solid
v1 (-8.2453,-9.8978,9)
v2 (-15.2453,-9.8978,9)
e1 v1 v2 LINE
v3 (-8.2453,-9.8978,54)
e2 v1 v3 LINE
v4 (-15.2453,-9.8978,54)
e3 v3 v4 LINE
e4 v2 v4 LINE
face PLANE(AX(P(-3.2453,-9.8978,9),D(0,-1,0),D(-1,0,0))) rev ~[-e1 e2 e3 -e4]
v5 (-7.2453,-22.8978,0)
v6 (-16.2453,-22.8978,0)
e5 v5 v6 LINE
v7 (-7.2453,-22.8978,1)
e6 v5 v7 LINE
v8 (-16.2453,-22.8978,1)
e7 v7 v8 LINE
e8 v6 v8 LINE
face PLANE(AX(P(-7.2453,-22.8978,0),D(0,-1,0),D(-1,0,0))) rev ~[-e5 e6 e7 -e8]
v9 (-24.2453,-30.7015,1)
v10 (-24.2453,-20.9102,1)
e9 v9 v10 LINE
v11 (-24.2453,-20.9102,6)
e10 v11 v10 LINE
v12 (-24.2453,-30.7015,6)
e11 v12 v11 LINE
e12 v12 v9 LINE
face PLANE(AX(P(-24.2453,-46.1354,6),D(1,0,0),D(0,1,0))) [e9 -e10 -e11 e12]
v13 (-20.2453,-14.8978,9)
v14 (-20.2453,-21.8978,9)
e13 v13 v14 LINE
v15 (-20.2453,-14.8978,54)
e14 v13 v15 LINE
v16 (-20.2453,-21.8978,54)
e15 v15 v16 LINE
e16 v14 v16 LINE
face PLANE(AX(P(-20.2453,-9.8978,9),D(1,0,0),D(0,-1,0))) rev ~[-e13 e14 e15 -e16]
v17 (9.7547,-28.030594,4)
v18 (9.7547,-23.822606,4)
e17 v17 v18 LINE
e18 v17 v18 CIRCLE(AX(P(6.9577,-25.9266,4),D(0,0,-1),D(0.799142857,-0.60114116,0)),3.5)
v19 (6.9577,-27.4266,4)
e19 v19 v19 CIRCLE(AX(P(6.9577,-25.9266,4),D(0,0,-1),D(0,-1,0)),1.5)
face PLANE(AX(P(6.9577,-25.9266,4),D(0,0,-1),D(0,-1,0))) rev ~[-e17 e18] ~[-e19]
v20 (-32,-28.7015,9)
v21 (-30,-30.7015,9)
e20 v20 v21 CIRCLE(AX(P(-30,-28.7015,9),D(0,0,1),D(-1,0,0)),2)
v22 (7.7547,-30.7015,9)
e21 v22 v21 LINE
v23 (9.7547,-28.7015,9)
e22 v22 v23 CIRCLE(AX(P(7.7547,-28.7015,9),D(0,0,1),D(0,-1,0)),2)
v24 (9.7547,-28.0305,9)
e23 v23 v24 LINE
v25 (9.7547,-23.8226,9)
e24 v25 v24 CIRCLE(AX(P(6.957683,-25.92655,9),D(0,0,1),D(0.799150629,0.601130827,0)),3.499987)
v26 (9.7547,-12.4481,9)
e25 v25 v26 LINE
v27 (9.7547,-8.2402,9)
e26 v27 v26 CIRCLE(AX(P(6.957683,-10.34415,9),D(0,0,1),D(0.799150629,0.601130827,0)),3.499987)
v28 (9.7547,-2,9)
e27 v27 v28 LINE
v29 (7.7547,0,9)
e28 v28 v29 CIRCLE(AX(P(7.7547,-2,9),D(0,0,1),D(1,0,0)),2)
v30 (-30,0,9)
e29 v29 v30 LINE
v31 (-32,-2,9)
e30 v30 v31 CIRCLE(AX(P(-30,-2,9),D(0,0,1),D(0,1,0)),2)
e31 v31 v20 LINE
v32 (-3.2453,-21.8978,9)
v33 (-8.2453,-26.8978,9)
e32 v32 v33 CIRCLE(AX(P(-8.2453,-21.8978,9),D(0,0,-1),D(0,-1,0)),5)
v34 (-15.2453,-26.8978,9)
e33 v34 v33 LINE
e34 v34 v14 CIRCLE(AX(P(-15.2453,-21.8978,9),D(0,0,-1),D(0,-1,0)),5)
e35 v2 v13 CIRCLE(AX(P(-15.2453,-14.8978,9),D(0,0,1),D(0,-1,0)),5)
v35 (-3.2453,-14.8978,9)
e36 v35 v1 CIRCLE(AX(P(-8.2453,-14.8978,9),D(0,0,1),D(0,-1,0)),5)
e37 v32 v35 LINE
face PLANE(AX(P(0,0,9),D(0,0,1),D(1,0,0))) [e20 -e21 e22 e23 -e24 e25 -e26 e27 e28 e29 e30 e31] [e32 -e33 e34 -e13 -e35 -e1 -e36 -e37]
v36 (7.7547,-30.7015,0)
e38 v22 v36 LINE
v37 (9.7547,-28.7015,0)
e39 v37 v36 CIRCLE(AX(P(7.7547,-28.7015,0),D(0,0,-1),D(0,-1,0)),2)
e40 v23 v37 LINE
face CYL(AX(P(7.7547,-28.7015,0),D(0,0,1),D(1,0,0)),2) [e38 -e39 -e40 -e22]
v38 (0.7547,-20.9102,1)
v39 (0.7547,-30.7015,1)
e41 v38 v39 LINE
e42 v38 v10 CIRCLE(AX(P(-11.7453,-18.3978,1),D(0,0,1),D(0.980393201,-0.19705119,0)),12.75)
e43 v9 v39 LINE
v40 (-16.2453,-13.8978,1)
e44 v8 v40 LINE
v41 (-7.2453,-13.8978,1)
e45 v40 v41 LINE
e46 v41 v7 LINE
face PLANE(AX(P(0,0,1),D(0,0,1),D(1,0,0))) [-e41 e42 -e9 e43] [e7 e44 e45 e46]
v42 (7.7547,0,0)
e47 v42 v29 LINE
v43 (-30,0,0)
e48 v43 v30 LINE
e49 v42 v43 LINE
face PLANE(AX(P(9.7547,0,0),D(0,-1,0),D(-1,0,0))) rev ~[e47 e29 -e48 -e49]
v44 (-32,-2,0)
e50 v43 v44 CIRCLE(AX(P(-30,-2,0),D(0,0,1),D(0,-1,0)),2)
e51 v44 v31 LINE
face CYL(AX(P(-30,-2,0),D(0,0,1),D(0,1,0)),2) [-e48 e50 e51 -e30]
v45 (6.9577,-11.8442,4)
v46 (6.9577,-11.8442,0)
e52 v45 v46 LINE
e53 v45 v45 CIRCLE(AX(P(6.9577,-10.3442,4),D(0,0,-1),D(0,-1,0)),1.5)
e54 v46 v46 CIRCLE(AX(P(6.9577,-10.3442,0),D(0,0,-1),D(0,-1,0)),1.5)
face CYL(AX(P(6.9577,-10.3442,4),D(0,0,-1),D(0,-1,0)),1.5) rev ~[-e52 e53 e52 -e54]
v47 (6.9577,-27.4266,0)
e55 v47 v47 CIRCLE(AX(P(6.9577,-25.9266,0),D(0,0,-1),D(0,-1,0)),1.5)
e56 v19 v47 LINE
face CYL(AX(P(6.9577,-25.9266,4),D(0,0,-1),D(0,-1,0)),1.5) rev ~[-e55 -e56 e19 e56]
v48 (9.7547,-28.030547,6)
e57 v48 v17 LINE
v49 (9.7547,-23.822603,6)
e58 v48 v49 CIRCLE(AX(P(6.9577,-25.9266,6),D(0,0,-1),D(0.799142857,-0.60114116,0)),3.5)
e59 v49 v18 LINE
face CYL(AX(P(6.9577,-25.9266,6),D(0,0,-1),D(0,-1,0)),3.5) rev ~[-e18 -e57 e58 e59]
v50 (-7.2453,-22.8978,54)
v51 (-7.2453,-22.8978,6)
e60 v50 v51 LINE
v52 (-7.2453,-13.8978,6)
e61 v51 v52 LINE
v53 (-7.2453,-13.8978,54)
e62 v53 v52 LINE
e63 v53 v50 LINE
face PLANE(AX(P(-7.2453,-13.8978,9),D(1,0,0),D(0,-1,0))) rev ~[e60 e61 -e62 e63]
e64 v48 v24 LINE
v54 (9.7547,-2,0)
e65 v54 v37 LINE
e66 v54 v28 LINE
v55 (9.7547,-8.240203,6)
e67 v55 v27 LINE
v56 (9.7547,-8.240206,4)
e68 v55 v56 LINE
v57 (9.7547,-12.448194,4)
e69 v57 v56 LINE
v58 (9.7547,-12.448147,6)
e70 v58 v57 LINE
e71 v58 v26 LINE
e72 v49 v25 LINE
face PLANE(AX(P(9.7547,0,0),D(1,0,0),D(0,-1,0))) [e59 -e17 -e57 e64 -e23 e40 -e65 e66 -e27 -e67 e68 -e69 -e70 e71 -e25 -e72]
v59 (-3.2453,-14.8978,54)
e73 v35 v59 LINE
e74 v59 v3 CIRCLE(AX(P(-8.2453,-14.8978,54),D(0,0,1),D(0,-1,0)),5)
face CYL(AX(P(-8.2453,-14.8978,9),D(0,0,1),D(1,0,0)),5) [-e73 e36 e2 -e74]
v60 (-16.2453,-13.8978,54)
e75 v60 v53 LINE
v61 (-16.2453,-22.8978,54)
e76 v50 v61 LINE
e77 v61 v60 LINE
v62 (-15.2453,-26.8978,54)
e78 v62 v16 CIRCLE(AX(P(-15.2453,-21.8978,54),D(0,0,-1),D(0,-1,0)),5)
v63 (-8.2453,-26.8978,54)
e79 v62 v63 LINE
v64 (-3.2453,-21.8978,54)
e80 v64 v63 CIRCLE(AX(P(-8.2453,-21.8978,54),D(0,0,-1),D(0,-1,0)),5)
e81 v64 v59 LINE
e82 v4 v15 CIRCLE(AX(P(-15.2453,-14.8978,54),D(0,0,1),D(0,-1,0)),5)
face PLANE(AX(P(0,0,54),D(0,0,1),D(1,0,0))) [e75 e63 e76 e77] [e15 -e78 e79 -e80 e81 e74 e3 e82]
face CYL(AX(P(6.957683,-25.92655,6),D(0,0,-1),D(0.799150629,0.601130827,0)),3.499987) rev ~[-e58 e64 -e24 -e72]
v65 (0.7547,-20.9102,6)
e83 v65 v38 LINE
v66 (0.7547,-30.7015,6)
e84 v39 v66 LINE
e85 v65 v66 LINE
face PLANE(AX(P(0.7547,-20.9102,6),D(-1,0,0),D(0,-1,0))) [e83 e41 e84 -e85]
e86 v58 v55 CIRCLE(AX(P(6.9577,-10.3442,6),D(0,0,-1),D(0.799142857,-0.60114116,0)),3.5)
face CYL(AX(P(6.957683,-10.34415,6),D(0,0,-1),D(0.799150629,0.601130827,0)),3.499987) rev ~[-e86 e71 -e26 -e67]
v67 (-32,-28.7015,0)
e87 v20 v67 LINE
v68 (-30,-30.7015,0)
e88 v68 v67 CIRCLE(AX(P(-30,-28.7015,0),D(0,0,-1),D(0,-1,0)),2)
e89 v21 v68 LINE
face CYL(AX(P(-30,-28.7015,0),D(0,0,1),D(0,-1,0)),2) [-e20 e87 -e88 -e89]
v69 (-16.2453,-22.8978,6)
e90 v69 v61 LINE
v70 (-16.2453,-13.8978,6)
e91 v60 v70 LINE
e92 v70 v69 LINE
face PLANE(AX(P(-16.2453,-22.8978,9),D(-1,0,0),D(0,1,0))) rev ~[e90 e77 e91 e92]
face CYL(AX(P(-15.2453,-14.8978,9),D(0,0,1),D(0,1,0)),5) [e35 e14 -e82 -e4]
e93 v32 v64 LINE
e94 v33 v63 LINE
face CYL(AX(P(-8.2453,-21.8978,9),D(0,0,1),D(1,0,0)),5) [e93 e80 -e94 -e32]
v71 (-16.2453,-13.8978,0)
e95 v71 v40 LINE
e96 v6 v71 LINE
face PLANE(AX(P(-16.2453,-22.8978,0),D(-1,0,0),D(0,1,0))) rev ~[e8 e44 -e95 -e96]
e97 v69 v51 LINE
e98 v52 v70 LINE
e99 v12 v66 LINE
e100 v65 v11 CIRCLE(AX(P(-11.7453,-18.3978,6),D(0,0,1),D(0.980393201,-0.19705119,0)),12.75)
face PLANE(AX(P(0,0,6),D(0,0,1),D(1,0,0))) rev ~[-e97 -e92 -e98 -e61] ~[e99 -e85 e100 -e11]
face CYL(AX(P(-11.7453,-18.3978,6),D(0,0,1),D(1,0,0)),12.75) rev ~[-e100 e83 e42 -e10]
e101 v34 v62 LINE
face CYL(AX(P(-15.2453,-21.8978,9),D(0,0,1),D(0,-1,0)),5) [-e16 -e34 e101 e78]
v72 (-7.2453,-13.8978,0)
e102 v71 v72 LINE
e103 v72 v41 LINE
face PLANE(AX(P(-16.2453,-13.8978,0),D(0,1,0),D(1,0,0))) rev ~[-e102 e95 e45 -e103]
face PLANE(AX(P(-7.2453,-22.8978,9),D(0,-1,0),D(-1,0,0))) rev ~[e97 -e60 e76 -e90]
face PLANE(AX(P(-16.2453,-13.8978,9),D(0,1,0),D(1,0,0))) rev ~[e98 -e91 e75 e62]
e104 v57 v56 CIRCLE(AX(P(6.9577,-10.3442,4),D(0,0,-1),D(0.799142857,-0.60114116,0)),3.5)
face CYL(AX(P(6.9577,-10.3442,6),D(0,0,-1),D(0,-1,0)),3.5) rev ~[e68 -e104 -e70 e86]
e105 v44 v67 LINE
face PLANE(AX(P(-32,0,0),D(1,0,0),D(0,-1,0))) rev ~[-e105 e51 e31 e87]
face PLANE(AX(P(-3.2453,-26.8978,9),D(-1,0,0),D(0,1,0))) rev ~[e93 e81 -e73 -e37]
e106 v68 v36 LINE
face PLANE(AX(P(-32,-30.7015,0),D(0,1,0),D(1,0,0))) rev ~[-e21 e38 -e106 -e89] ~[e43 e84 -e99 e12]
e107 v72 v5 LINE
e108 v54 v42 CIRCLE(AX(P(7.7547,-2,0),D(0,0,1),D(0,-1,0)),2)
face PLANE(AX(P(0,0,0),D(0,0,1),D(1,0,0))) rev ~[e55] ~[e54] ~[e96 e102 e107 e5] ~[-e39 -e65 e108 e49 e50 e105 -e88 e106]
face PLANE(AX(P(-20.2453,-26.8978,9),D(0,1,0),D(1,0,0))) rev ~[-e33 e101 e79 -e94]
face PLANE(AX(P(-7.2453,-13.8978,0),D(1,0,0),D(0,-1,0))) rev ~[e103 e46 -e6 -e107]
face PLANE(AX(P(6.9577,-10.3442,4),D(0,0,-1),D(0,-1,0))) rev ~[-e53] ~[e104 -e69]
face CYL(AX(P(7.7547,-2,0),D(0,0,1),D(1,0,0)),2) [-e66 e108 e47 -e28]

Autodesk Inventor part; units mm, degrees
ref_plane "YZ Plane" through (0, 0, 0) normal (1, 0, 0) x (0, 1, 0)
ref_plane "XZ Plane" through (0, 0, 0) normal (0, 1, 0) x (-1, 0, 0)
ref_plane "XY Plane" through (0, 0, 0) normal (0, 0, 1) x (1, 0, 0)
ref_plane "Work Plane1" through (0, 0, 0) normal (0, 0, 1) x (1, 0, 0)
sketch "Sketch1" plane through (0, 0, 0) normal (0, 0, 1) x (1, 0, 0)
  line L0 (9.7547, 0) -> (-32, 0) construction
  line L1 (-32, 0) -> (-32, -5) construction
  line L2 (-5, -5) -> (-32, -5) construction
  line L3 (-5, -30.7015) -> (-5, -5) construction
  line L4 (-0.2453, -30.7015) -> (-5, -30.7015) construction
  line L5 (-0.2453, -30.7015) -> (-0.2453, -31) construction
  line L6 (-0.2453, -31) -> (4.1607, -31) construction
  line L7 (4.1607, -66) -> (4.1607, -31) projected
  line L8 (9.7547, -66) -> (4.1607, -66) projected
  line L9 (9.7547, 0) -> (9.7547, -66) projected
  circle A0 centre (-2.5, -10.3442) radius 1.45 construction
  circle A1 centre (-2.5, -25.9266) radius 1.45 construction
  circle A2 centre (-11.7453, -18.3978) radius 6 construction
  line L10 (-7.2453, -22.8978) -> (-16.2453, -22.8978)
  line L11 (-16.2453, -22.8978) -> (-16.2453, -13.8978)
  line L12 (-16.2453, -13.8978) -> (-7.2453, -13.8978)
  line L13 (-7.2453, -13.8978) -> (-7.2453, -22.8978)
  line L14 (-7.2453, -22.8978) -> (-16.2453, -13.8978)
  line L15 (-16.2453, -22.8978) -> (-7.2453, -13.8978)
  line L16 (9.7547, 0) -> (-32, 0) projected
  line L17 (9.7547, 0) -> (-32, 0) construction
  line L18 (-32, 0) -> (-32, -5) construction
  line L19 (-5, -5) -> (-32, -5) construction
  line L20 (-5, -30.7015) -> (-5, -5) construction
  line L21 (-0.2453, -30.7015) -> (-5, -30.7015) construction
  line L22 (-0.2453, -30.7015) -> (-0.2453, -31) construction
  line L23 (-0.2453, -31) -> (4.1607, -31) construction
  line L24 (4.1607, -66) -> (4.1607, -31) construction
  line L25 (9.7547, -66) -> (4.1607, -66) construction
  line L26 (9.7547, 0) -> (9.7547, -66) construction
  circle A3 centre (-2.5, -10.3442) radius 1.45 construction
  circle A4 centre (-2.5, -25.9266) radius 1.45 construction
  line L27 (9.7547, 0) -> (-32, 0)
  line L28 (-32, 0) -> (-32, -30.7015)
  line L29 (-32, -30.7015) -> (9.7547, -30.7015)
  line L30 (9.7547, -30.7015) -> (9.7547, 0)
  circle A5 centre (-2.5, -25.9266) radius 1.65
  circle A6 centre (-2.5, -10.3442) radius 1.65
  circle A7 centre (6.9577, -25.9266) radius 1.45 projected
  circle A8 centre (6.9577, -10.3442) radius 1.45 projected
  circle A9 centre (6.9577, -25.9266) radius 1.45 projected
  circle A10 centre (6.9577, -10.3442) radius 1.45 projected
  point P0 (0, 0)
  dimension "d0" = 9
  dimension "d1" = 9
  dimension "d2" = 3.3
  dimension "d3" = 3.3
extrude "Extrusion1" add sketch "Sketch1" along normal blind 6 contours L9 L29 L28 L16 | A5 | A6 | A7 | A8
sketch "Sketch2" plane through (0, 0, 6) normal (0, 0, 1) x (1, 0, 0)
  circle A0 centre (-2.5, -25.9266) radius 1.65 projected
  circle A1 centre (-2.5, -10.3442) radius 1.65 projected
  circle A2 centre (6.9577, -25.9266) radius 1.45 projected
  circle A3 centre (6.9577, -10.3442) radius 1.45 projected
  point P0 (0, 0)
hole "Hole1" at (6.9577, -25.9266, 6) at (6.9577, -10.3442, 6) direction (0, 0, -1) diameter 3 end through all counterbore diameter 7 counterbore depth 2
fillet "Fillet1" radius 2 4 edges at (-32, 0, 3) (9.7547, 0, 3) (9.7547, -30.7015, 3) (-32, -30.7015, 3)
sketch "Sketch3" plane through (0, 0, 6) normal (0, 0, 1) x (1, 0, 0)
  line L0 (-16.2453, -22.8978) -> (-16.2453, -13.8978) projected
  line L1 (-7.2453, -13.8978) -> (-7.2453, -22.8978) projected
  line L2 (-7.2453, -22.8978) -> (-16.2453, -22.8978) projected
  circle A0 centre (-11.7453, -18.3978) radius 6 projected
  circle A1 centre (-11.7453, -18.3978) radius 12.75
  line L3 (-24.4953, -18.3978) -> (1.0047, -18.3978)
  line L4 (0.7547, -46.1354) -> (-24.2453, -46.1354)
  line L5 (-24.2453, -46.1354) -> (-24.2453, -20.9102)
  line L6 (-24.2453, -20.9102) -> (0.7547, -20.9102)
  line L7 (0.7547, -20.9102) -> (0.7547, -46.1354)
  line L8 (0.7547, -46.1354) -> (-24.2453, -20.9102) construction
  line L9 (-24.2453, -46.1354) -> (0.7547, -20.9102) construction
  point P0 (0, 0)
  point P1 (-11.7453, -33.5228)
  dimension "d14" = 25.5
  dimension "d17" = 25
extrude "Extrusion2" cut sketch "Sketch3" against normal blind 5
sketch "Sketch4" plane through (0, 0, 6) normal (0, 0, 1) x (1, 0, 0)
  line L0 (0.7547, -20.9102) -> (0.7547, -30.7015) projected
  line L1 (0.7547, -30.7015) -> (7.7547, -30.7015) projected
  arc A0 (7.7547, -30.7015) -> (9.7547, -28.7015) centre (7.7547, -28.7015) ccw projected
  line L2 (9.7547, -28.7015) -> (9.7547, -28.0305) projected
  arc A1 (9.7547, -23.8226) -> (9.7547, -28.0305) centre (6.9577, -25.9266) ccw projected
  line L3 (9.7547, -23.8226) -> (9.7547, -12.4481) projected
  arc A2 (9.7547, -8.2402) -> (9.7547, -12.4481) centre (6.9577, -10.3442) ccw projected
  line L4 (9.7547, -8.2402) -> (9.7547, -2) projected
  arc A3 (9.7547, -2) -> (7.7547, 0) centre (7.7547, -2) ccw projected
  line L5 (7.7547, 0) -> (-30, 0) projected
  arc A4 (-30, 0) -> (-32, -2) centre (-30, -2) ccw projected
  line L6 (-32, -2) -> (-32, -28.7015) projected
  arc A5 (-32, -28.7015) -> (-30, -30.7015) centre (-30, -28.7015) ccw projected
  line L7 (-30, -30.7015) -> (-24.2453, -30.7015) projected
  line L8 (-24.2453, -30.7015) -> (-24.2453, -20.9102) projected
  arc A6 (0.7547, -20.9102) -> (-24.2453, -20.9102) centre (-11.7453, -18.3978) ccw projected
  line L9 (0.7547, -30.7015) -> (7.7547, -30.7015) projected
  line L10 (-24.2453, -30.7015) -> (0.7547, -30.7015)
  line L11 (-16.2453, -13.8978) -> (-16.2453, -22.8978) projected
  line L12 (-16.2453, -22.8978) -> (-7.2453, -22.8978) projected
  line L13 (-7.2453, -13.8978) -> (-16.2453, -13.8978) projected
  line L14 (-7.2453, -22.8978) -> (-7.2453, -13.8978) projected
  point P0 (0, 0)
extrude "Extrusion3" add sketch "Sketch4" along normal blind 3
sketch "Sketch5" plane through (0, 0, 9) normal (0, 0, 1) x (1, 0, 0)
  line L0 (-16.2453, -22.8978) -> (-16.2453, -13.8978) projected
  line L1 (-7.2453, -13.8978) -> (-7.2453, -22.8978) projected
  line L2 (-7.2453, -22.8978) -> (-16.2453, -22.8978) projected
  line L3 (-16.2453, -13.8978) -> (-7.2453, -13.8978) projected
  line L4 (-7.2453, -13.8978) -> (-7.2453, -22.8978) projected
  line L5 (-7.2453, -22.8978) -> (-16.2453, -22.8978) projected
  line L6 (-16.2453, -22.8978) -> (-16.2453, -13.8978) projected
  line L7 (-30, -30.7015) -> (7.7547, -30.7015) projected
  arc A0 (7.7547, -30.7015) -> (9.7547, -28.7015) centre (7.7547, -28.7015) ccw projected
  line L8 (9.7547, -28.7015) -> (9.7547, -28.0305) projected
  arc A1 (9.7547, -23.8226) -> (9.7547, -28.0305) centre (6.9577, -25.9266) ccw projected
  line L9 (9.7547, -23.8226) -> (9.7547, -12.4481) projected
  arc A2 (9.7547, -8.2402) -> (9.7547, -12.4481) centre (6.9577, -10.3442) ccw projected
  line L10 (9.7547, -8.2402) -> (9.7547, -2) projected
  arc A3 (9.7547, -2) -> (7.7547, 0) centre (7.7547, -2) ccw projected
  line L11 (7.7547, 0) -> (-30, 0) projected
  arc A4 (-30, 0) -> (-32, -2) centre (-30, -2) ccw projected
  line L12 (-32, -2) -> (-32, -28.7015) projected
  arc A5 (-32, -28.7015) -> (-30, -30.7015) centre (-30, -28.7015) ccw projected
  line L13 (-3.2453, -9.8978) -> (-20.2453, -9.8978)
  line L14 (-20.2453, -9.8978) -> (-20.2453, -26.8978)
  line L15 (-20.2453, -26.8978) -> (-3.2453, -26.8978)
  line L16 (-3.2453, -26.8978) -> (-3.2453, -9.8978)
  point P0 (0, 0)
  dimension "d20" = 4
extrude "Extrusion4" add sketch "Sketch5" along normal blind 45 contours L16 L15 L14 L13
fillet "Fillet2" radius 5 4 edges at (-3.2453, -26.8978, 31.5) (-20.2453, -26.8978, 31.5) (-3.2453, -9.8978, 31.5) (-20.2453, -9.8978, 31.5)
properties part number "30_cellSTORM_laserbase_ESP32cameradapter_v3"
